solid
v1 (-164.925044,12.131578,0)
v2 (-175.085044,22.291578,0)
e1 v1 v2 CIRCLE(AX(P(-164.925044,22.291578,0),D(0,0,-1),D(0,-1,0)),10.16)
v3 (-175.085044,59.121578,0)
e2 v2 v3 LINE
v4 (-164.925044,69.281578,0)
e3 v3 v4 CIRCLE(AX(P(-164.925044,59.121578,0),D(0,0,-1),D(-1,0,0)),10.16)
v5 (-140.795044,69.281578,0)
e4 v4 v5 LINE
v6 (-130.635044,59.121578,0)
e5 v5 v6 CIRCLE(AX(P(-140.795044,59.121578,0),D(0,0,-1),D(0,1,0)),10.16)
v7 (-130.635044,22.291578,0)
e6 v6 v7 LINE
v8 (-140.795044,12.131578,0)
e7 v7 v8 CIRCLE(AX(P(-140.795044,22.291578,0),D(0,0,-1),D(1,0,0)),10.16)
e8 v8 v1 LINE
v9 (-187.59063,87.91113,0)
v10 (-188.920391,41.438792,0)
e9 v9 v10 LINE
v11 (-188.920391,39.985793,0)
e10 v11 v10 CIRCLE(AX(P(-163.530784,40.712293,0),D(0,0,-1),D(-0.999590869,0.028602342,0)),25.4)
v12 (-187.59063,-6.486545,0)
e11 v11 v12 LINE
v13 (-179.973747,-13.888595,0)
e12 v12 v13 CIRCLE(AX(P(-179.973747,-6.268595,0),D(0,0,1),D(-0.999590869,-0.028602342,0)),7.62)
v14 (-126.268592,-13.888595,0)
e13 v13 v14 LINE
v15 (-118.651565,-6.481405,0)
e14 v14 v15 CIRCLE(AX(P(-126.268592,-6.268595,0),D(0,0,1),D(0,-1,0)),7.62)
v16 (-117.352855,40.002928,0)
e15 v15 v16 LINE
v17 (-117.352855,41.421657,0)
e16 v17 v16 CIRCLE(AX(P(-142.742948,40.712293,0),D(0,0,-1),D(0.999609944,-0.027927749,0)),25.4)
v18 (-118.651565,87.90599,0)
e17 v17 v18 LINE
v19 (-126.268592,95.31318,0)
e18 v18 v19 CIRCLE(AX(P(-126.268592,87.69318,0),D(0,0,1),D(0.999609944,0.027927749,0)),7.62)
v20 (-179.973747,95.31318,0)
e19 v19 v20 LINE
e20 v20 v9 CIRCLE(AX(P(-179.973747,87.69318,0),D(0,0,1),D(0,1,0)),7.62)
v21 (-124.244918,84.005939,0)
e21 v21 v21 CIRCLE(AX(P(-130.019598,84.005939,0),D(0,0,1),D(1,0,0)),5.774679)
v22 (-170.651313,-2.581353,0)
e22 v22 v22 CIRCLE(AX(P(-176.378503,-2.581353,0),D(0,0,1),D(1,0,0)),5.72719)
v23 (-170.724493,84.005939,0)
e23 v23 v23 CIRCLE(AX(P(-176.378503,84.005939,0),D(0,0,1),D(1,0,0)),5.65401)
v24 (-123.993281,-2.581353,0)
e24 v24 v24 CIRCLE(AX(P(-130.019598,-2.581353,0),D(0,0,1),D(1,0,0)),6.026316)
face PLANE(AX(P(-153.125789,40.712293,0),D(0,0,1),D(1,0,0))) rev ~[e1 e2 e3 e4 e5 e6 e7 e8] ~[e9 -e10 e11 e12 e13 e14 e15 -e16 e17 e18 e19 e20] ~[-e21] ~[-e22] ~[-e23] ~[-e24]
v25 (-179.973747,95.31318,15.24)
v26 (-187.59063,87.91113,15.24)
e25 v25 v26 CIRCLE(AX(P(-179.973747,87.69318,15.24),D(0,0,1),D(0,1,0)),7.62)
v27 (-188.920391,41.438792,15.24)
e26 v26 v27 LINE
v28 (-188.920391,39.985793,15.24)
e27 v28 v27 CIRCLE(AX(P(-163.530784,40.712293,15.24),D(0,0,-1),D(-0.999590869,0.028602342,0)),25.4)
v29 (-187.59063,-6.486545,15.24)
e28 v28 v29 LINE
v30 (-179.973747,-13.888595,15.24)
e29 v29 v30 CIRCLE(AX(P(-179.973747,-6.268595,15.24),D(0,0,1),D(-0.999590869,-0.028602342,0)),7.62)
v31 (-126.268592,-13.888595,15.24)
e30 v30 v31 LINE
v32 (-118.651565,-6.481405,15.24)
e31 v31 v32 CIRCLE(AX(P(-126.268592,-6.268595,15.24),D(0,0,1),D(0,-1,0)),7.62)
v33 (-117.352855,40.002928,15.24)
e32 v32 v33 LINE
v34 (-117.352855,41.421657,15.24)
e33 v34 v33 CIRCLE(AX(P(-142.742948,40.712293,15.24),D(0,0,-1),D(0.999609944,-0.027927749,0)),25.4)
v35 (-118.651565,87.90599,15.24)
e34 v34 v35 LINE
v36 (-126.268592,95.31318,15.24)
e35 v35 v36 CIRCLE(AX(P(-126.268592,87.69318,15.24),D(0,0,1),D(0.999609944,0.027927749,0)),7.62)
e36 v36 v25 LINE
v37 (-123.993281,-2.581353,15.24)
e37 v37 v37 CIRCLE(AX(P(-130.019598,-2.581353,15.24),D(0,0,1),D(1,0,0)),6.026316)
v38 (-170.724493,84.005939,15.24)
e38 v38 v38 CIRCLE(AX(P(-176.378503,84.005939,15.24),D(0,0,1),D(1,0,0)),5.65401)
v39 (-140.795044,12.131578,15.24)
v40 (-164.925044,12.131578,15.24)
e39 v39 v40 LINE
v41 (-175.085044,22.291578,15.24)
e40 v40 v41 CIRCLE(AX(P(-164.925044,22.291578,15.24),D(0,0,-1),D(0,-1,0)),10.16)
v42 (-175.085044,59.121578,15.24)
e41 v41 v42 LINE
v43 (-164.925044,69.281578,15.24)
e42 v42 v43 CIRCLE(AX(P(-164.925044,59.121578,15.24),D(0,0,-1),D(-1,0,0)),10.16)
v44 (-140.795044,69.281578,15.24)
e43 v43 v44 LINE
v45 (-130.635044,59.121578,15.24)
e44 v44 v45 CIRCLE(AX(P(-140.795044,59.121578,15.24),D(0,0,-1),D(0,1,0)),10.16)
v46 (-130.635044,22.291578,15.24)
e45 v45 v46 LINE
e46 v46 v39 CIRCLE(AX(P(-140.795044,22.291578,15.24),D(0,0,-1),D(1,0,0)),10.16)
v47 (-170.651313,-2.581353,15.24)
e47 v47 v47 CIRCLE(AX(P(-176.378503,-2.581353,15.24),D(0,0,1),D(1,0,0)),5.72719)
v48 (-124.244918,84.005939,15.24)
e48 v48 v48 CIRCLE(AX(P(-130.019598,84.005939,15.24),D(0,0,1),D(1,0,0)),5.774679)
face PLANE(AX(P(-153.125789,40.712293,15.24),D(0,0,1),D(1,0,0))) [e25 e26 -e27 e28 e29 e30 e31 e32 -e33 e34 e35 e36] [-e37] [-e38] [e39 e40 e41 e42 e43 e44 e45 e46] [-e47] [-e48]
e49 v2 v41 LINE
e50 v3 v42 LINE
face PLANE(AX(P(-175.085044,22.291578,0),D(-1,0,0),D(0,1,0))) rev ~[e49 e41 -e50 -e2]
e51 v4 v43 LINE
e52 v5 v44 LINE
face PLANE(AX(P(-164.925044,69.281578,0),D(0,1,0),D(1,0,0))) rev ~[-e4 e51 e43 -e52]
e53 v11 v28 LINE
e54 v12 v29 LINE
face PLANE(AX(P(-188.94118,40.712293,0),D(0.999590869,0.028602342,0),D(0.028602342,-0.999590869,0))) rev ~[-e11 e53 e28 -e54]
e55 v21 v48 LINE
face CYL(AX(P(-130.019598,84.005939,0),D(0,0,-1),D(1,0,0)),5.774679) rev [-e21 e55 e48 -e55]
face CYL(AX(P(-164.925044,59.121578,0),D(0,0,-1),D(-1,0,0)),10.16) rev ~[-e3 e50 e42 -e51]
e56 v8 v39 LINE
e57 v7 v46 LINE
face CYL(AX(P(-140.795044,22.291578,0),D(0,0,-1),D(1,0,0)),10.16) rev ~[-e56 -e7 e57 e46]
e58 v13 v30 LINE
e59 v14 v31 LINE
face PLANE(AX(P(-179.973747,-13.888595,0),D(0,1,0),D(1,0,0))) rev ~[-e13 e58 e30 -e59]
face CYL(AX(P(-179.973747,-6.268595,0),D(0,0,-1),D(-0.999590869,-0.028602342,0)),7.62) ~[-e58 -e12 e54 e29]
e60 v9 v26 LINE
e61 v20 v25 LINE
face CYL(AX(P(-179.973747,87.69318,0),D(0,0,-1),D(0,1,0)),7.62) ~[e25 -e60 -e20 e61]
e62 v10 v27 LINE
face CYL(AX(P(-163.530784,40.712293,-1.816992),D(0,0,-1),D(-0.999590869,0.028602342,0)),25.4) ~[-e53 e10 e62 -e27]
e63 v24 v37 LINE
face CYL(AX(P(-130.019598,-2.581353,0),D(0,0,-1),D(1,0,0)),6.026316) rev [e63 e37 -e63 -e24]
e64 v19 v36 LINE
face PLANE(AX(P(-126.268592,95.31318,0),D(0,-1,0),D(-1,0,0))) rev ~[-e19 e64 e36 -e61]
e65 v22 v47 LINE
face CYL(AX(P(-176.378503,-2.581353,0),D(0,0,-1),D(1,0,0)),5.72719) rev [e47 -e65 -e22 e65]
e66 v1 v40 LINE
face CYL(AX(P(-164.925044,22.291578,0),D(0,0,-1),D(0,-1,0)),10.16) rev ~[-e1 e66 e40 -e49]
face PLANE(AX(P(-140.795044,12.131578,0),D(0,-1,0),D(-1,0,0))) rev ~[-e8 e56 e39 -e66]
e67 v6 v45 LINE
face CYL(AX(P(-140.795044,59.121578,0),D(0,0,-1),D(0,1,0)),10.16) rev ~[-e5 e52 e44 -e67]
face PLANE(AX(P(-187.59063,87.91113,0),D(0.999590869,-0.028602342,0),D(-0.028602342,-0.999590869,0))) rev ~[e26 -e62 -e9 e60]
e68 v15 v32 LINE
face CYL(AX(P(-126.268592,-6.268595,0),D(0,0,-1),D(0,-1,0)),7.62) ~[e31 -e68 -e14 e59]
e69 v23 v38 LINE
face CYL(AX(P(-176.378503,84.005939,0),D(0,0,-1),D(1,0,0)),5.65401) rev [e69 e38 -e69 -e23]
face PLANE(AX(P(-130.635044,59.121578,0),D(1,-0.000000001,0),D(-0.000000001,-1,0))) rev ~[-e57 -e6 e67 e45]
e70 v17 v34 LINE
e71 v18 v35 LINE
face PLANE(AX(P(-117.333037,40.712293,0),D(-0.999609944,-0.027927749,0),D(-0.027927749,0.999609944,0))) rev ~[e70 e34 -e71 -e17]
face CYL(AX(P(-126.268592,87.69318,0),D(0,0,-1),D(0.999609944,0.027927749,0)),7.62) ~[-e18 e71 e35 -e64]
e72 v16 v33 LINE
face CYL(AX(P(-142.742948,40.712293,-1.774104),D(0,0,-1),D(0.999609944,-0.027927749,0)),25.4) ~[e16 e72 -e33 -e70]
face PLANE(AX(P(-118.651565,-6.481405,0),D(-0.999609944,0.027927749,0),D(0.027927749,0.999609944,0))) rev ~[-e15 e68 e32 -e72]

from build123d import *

# Parameters (mm, degrees)
F0_R        = 5.7271899427
F0_R_2      = 6.0263161758
F0_R_3      = 5.6540098822
F0_R_4      = 5.7746792183
F1_DEPTH    = 15.24
F2_T1_DEPTH = 18.788208103
F2_T3_DEPTH = 18.873984206


# Not quite as in the source:
# - a fillet or chamfer that OpenCascade refuses, or shapes differently, is made with other operations: its cross-section is extruded or revolved along the edge and cut away or added


with BuildPart() as f1:
    # F0 (on Top) → F1 (new body)
    with BuildSketch(Plane.XY):
        with BuildLine():
            Line((-126.2685924224, 95.313180417), (-179.9737472962, 95.313180417))
            ThreePointArc((-179.9737472962, 95.313180417), (-185.2842850362, 93.1578477365), (-187.5906297205, 87.9111302629))
            Line((-187.5906297205, 87.9111302629), (-188.941179568, 40.7122925946))
            Line((-188.941179568, 40.7122925946), (-187.5906297205, -6.4865450738))
            ThreePointArc((-187.5906297205, -6.4865450738), (-185.2842850362, -11.7332625474), (-179.9737472962, -13.8885952279))
            Line((-179.9737472962, -13.8885952279), (-126.2685924224, -13.8885952279))
            ThreePointArc((-126.2685924224, -13.8885952279), (-120.9562110346, -11.7314702942), (-118.6515646464, -6.4814046742))
            Line((-118.6515646464, -6.4814046742), (-117.3330366223, 40.7122925946))
            Line((-117.3330366223, 40.7122925946), (-118.6515646464, 87.9059898633))
            ThreePointArc((-118.6515646464, 87.9059898633), (-120.9562110346, 93.1560554834), (-126.2685924224, 95.313180417))
        make_face()
        with Locations((-176.378503075, -2.5813533248)):
            Circle(F0_R, mode=Mode.SUBTRACT)
        with Locations((-130.0195976365, -2.5813533248)):
            Circle(F0_R_2, mode=Mode.SUBTRACT)
        with BuildLine():
            Line((-130.635044248, 59.1215779044), (-130.6350442799, 22.2915779044))
            ThreePointArc((-130.6350442799, 22.2915779044), (-133.610839383, 15.1073730075), (-140.7950442799, 12.1315779044))
            Line((-140.7950442799, 12.1315779044), (-164.9250442799, 12.1315779044))
            ThreePointArc((-164.9250442799, 12.1315779044), (-172.1092491767, 15.1073730075), (-175.0850442799, 22.2915779044))
            Line((-175.0850442799, 22.2915779044), (-175.0850442799, 59.1215779044))
            ThreePointArc((-175.0850442799, 59.1215779044), (-172.1092491767, 66.3057828012), (-164.9250442799, 69.2815779044))
            Line((-164.9250442799, 69.2815779044), (-140.7950442799, 69.2815779044))
            ThreePointArc((-140.7950442799, 69.2815779044), (-133.6108393717, 66.3057828031), (-130.635044248, 59.1215779044))
        make_face(mode=Mode.SUBTRACT)
        with Locations((-176.378503075, 84.005938514)):
            Circle(F0_R_3, mode=Mode.SUBTRACT)
        with Locations((-130.0195976365, 84.005938514)):
            Circle(F0_R_4, mode=Mode.SUBTRACT)
    extrude(amount=F1_DEPTH)

    # F2: fillet of radius 25.4 on 2 edges, made by hand

    # F2_s2 → F2_t1 (cut)
    with BuildSketch(Plane.XY.offset(-1.7741040515)):
        with BuildLine():
            ThreePointArc((-117.3528553153, 40.0029277737), (-117.3429479018, 40.7122925946), (-117.3528553153, 41.4216574155))
            Line((-117.3528553153, 41.4216574155), (-117.3330366223, 40.7122925946))
            Line((-117.3330366223, 40.7122925946), (-117.3528553153, 40.0029277737))
        make_face()
    extrude(amount=F2_T1_DEPTH, mode=Mode.SUBTRACT)

    # F2_s4 → F2_t3 (cut)
    with BuildSketch(Plane.XY.offset(-1.816992103)):
        with BuildLine():
            ThreePointArc((-188.9203914761, 41.4387920809), (-188.9307833954, 40.7122925946), (-188.9203914761, 39.9857931082))
            Line((-188.9203914761, 39.9857931082), (-188.941179568, 40.7122925946))
            Line((-188.941179568, 40.7122925946), (-188.9203914761, 41.4387920809))
        make_face()
    extrude(amount=F2_T3_DEPTH, mode=Mode.SUBTRACT)


solid = f1.part
